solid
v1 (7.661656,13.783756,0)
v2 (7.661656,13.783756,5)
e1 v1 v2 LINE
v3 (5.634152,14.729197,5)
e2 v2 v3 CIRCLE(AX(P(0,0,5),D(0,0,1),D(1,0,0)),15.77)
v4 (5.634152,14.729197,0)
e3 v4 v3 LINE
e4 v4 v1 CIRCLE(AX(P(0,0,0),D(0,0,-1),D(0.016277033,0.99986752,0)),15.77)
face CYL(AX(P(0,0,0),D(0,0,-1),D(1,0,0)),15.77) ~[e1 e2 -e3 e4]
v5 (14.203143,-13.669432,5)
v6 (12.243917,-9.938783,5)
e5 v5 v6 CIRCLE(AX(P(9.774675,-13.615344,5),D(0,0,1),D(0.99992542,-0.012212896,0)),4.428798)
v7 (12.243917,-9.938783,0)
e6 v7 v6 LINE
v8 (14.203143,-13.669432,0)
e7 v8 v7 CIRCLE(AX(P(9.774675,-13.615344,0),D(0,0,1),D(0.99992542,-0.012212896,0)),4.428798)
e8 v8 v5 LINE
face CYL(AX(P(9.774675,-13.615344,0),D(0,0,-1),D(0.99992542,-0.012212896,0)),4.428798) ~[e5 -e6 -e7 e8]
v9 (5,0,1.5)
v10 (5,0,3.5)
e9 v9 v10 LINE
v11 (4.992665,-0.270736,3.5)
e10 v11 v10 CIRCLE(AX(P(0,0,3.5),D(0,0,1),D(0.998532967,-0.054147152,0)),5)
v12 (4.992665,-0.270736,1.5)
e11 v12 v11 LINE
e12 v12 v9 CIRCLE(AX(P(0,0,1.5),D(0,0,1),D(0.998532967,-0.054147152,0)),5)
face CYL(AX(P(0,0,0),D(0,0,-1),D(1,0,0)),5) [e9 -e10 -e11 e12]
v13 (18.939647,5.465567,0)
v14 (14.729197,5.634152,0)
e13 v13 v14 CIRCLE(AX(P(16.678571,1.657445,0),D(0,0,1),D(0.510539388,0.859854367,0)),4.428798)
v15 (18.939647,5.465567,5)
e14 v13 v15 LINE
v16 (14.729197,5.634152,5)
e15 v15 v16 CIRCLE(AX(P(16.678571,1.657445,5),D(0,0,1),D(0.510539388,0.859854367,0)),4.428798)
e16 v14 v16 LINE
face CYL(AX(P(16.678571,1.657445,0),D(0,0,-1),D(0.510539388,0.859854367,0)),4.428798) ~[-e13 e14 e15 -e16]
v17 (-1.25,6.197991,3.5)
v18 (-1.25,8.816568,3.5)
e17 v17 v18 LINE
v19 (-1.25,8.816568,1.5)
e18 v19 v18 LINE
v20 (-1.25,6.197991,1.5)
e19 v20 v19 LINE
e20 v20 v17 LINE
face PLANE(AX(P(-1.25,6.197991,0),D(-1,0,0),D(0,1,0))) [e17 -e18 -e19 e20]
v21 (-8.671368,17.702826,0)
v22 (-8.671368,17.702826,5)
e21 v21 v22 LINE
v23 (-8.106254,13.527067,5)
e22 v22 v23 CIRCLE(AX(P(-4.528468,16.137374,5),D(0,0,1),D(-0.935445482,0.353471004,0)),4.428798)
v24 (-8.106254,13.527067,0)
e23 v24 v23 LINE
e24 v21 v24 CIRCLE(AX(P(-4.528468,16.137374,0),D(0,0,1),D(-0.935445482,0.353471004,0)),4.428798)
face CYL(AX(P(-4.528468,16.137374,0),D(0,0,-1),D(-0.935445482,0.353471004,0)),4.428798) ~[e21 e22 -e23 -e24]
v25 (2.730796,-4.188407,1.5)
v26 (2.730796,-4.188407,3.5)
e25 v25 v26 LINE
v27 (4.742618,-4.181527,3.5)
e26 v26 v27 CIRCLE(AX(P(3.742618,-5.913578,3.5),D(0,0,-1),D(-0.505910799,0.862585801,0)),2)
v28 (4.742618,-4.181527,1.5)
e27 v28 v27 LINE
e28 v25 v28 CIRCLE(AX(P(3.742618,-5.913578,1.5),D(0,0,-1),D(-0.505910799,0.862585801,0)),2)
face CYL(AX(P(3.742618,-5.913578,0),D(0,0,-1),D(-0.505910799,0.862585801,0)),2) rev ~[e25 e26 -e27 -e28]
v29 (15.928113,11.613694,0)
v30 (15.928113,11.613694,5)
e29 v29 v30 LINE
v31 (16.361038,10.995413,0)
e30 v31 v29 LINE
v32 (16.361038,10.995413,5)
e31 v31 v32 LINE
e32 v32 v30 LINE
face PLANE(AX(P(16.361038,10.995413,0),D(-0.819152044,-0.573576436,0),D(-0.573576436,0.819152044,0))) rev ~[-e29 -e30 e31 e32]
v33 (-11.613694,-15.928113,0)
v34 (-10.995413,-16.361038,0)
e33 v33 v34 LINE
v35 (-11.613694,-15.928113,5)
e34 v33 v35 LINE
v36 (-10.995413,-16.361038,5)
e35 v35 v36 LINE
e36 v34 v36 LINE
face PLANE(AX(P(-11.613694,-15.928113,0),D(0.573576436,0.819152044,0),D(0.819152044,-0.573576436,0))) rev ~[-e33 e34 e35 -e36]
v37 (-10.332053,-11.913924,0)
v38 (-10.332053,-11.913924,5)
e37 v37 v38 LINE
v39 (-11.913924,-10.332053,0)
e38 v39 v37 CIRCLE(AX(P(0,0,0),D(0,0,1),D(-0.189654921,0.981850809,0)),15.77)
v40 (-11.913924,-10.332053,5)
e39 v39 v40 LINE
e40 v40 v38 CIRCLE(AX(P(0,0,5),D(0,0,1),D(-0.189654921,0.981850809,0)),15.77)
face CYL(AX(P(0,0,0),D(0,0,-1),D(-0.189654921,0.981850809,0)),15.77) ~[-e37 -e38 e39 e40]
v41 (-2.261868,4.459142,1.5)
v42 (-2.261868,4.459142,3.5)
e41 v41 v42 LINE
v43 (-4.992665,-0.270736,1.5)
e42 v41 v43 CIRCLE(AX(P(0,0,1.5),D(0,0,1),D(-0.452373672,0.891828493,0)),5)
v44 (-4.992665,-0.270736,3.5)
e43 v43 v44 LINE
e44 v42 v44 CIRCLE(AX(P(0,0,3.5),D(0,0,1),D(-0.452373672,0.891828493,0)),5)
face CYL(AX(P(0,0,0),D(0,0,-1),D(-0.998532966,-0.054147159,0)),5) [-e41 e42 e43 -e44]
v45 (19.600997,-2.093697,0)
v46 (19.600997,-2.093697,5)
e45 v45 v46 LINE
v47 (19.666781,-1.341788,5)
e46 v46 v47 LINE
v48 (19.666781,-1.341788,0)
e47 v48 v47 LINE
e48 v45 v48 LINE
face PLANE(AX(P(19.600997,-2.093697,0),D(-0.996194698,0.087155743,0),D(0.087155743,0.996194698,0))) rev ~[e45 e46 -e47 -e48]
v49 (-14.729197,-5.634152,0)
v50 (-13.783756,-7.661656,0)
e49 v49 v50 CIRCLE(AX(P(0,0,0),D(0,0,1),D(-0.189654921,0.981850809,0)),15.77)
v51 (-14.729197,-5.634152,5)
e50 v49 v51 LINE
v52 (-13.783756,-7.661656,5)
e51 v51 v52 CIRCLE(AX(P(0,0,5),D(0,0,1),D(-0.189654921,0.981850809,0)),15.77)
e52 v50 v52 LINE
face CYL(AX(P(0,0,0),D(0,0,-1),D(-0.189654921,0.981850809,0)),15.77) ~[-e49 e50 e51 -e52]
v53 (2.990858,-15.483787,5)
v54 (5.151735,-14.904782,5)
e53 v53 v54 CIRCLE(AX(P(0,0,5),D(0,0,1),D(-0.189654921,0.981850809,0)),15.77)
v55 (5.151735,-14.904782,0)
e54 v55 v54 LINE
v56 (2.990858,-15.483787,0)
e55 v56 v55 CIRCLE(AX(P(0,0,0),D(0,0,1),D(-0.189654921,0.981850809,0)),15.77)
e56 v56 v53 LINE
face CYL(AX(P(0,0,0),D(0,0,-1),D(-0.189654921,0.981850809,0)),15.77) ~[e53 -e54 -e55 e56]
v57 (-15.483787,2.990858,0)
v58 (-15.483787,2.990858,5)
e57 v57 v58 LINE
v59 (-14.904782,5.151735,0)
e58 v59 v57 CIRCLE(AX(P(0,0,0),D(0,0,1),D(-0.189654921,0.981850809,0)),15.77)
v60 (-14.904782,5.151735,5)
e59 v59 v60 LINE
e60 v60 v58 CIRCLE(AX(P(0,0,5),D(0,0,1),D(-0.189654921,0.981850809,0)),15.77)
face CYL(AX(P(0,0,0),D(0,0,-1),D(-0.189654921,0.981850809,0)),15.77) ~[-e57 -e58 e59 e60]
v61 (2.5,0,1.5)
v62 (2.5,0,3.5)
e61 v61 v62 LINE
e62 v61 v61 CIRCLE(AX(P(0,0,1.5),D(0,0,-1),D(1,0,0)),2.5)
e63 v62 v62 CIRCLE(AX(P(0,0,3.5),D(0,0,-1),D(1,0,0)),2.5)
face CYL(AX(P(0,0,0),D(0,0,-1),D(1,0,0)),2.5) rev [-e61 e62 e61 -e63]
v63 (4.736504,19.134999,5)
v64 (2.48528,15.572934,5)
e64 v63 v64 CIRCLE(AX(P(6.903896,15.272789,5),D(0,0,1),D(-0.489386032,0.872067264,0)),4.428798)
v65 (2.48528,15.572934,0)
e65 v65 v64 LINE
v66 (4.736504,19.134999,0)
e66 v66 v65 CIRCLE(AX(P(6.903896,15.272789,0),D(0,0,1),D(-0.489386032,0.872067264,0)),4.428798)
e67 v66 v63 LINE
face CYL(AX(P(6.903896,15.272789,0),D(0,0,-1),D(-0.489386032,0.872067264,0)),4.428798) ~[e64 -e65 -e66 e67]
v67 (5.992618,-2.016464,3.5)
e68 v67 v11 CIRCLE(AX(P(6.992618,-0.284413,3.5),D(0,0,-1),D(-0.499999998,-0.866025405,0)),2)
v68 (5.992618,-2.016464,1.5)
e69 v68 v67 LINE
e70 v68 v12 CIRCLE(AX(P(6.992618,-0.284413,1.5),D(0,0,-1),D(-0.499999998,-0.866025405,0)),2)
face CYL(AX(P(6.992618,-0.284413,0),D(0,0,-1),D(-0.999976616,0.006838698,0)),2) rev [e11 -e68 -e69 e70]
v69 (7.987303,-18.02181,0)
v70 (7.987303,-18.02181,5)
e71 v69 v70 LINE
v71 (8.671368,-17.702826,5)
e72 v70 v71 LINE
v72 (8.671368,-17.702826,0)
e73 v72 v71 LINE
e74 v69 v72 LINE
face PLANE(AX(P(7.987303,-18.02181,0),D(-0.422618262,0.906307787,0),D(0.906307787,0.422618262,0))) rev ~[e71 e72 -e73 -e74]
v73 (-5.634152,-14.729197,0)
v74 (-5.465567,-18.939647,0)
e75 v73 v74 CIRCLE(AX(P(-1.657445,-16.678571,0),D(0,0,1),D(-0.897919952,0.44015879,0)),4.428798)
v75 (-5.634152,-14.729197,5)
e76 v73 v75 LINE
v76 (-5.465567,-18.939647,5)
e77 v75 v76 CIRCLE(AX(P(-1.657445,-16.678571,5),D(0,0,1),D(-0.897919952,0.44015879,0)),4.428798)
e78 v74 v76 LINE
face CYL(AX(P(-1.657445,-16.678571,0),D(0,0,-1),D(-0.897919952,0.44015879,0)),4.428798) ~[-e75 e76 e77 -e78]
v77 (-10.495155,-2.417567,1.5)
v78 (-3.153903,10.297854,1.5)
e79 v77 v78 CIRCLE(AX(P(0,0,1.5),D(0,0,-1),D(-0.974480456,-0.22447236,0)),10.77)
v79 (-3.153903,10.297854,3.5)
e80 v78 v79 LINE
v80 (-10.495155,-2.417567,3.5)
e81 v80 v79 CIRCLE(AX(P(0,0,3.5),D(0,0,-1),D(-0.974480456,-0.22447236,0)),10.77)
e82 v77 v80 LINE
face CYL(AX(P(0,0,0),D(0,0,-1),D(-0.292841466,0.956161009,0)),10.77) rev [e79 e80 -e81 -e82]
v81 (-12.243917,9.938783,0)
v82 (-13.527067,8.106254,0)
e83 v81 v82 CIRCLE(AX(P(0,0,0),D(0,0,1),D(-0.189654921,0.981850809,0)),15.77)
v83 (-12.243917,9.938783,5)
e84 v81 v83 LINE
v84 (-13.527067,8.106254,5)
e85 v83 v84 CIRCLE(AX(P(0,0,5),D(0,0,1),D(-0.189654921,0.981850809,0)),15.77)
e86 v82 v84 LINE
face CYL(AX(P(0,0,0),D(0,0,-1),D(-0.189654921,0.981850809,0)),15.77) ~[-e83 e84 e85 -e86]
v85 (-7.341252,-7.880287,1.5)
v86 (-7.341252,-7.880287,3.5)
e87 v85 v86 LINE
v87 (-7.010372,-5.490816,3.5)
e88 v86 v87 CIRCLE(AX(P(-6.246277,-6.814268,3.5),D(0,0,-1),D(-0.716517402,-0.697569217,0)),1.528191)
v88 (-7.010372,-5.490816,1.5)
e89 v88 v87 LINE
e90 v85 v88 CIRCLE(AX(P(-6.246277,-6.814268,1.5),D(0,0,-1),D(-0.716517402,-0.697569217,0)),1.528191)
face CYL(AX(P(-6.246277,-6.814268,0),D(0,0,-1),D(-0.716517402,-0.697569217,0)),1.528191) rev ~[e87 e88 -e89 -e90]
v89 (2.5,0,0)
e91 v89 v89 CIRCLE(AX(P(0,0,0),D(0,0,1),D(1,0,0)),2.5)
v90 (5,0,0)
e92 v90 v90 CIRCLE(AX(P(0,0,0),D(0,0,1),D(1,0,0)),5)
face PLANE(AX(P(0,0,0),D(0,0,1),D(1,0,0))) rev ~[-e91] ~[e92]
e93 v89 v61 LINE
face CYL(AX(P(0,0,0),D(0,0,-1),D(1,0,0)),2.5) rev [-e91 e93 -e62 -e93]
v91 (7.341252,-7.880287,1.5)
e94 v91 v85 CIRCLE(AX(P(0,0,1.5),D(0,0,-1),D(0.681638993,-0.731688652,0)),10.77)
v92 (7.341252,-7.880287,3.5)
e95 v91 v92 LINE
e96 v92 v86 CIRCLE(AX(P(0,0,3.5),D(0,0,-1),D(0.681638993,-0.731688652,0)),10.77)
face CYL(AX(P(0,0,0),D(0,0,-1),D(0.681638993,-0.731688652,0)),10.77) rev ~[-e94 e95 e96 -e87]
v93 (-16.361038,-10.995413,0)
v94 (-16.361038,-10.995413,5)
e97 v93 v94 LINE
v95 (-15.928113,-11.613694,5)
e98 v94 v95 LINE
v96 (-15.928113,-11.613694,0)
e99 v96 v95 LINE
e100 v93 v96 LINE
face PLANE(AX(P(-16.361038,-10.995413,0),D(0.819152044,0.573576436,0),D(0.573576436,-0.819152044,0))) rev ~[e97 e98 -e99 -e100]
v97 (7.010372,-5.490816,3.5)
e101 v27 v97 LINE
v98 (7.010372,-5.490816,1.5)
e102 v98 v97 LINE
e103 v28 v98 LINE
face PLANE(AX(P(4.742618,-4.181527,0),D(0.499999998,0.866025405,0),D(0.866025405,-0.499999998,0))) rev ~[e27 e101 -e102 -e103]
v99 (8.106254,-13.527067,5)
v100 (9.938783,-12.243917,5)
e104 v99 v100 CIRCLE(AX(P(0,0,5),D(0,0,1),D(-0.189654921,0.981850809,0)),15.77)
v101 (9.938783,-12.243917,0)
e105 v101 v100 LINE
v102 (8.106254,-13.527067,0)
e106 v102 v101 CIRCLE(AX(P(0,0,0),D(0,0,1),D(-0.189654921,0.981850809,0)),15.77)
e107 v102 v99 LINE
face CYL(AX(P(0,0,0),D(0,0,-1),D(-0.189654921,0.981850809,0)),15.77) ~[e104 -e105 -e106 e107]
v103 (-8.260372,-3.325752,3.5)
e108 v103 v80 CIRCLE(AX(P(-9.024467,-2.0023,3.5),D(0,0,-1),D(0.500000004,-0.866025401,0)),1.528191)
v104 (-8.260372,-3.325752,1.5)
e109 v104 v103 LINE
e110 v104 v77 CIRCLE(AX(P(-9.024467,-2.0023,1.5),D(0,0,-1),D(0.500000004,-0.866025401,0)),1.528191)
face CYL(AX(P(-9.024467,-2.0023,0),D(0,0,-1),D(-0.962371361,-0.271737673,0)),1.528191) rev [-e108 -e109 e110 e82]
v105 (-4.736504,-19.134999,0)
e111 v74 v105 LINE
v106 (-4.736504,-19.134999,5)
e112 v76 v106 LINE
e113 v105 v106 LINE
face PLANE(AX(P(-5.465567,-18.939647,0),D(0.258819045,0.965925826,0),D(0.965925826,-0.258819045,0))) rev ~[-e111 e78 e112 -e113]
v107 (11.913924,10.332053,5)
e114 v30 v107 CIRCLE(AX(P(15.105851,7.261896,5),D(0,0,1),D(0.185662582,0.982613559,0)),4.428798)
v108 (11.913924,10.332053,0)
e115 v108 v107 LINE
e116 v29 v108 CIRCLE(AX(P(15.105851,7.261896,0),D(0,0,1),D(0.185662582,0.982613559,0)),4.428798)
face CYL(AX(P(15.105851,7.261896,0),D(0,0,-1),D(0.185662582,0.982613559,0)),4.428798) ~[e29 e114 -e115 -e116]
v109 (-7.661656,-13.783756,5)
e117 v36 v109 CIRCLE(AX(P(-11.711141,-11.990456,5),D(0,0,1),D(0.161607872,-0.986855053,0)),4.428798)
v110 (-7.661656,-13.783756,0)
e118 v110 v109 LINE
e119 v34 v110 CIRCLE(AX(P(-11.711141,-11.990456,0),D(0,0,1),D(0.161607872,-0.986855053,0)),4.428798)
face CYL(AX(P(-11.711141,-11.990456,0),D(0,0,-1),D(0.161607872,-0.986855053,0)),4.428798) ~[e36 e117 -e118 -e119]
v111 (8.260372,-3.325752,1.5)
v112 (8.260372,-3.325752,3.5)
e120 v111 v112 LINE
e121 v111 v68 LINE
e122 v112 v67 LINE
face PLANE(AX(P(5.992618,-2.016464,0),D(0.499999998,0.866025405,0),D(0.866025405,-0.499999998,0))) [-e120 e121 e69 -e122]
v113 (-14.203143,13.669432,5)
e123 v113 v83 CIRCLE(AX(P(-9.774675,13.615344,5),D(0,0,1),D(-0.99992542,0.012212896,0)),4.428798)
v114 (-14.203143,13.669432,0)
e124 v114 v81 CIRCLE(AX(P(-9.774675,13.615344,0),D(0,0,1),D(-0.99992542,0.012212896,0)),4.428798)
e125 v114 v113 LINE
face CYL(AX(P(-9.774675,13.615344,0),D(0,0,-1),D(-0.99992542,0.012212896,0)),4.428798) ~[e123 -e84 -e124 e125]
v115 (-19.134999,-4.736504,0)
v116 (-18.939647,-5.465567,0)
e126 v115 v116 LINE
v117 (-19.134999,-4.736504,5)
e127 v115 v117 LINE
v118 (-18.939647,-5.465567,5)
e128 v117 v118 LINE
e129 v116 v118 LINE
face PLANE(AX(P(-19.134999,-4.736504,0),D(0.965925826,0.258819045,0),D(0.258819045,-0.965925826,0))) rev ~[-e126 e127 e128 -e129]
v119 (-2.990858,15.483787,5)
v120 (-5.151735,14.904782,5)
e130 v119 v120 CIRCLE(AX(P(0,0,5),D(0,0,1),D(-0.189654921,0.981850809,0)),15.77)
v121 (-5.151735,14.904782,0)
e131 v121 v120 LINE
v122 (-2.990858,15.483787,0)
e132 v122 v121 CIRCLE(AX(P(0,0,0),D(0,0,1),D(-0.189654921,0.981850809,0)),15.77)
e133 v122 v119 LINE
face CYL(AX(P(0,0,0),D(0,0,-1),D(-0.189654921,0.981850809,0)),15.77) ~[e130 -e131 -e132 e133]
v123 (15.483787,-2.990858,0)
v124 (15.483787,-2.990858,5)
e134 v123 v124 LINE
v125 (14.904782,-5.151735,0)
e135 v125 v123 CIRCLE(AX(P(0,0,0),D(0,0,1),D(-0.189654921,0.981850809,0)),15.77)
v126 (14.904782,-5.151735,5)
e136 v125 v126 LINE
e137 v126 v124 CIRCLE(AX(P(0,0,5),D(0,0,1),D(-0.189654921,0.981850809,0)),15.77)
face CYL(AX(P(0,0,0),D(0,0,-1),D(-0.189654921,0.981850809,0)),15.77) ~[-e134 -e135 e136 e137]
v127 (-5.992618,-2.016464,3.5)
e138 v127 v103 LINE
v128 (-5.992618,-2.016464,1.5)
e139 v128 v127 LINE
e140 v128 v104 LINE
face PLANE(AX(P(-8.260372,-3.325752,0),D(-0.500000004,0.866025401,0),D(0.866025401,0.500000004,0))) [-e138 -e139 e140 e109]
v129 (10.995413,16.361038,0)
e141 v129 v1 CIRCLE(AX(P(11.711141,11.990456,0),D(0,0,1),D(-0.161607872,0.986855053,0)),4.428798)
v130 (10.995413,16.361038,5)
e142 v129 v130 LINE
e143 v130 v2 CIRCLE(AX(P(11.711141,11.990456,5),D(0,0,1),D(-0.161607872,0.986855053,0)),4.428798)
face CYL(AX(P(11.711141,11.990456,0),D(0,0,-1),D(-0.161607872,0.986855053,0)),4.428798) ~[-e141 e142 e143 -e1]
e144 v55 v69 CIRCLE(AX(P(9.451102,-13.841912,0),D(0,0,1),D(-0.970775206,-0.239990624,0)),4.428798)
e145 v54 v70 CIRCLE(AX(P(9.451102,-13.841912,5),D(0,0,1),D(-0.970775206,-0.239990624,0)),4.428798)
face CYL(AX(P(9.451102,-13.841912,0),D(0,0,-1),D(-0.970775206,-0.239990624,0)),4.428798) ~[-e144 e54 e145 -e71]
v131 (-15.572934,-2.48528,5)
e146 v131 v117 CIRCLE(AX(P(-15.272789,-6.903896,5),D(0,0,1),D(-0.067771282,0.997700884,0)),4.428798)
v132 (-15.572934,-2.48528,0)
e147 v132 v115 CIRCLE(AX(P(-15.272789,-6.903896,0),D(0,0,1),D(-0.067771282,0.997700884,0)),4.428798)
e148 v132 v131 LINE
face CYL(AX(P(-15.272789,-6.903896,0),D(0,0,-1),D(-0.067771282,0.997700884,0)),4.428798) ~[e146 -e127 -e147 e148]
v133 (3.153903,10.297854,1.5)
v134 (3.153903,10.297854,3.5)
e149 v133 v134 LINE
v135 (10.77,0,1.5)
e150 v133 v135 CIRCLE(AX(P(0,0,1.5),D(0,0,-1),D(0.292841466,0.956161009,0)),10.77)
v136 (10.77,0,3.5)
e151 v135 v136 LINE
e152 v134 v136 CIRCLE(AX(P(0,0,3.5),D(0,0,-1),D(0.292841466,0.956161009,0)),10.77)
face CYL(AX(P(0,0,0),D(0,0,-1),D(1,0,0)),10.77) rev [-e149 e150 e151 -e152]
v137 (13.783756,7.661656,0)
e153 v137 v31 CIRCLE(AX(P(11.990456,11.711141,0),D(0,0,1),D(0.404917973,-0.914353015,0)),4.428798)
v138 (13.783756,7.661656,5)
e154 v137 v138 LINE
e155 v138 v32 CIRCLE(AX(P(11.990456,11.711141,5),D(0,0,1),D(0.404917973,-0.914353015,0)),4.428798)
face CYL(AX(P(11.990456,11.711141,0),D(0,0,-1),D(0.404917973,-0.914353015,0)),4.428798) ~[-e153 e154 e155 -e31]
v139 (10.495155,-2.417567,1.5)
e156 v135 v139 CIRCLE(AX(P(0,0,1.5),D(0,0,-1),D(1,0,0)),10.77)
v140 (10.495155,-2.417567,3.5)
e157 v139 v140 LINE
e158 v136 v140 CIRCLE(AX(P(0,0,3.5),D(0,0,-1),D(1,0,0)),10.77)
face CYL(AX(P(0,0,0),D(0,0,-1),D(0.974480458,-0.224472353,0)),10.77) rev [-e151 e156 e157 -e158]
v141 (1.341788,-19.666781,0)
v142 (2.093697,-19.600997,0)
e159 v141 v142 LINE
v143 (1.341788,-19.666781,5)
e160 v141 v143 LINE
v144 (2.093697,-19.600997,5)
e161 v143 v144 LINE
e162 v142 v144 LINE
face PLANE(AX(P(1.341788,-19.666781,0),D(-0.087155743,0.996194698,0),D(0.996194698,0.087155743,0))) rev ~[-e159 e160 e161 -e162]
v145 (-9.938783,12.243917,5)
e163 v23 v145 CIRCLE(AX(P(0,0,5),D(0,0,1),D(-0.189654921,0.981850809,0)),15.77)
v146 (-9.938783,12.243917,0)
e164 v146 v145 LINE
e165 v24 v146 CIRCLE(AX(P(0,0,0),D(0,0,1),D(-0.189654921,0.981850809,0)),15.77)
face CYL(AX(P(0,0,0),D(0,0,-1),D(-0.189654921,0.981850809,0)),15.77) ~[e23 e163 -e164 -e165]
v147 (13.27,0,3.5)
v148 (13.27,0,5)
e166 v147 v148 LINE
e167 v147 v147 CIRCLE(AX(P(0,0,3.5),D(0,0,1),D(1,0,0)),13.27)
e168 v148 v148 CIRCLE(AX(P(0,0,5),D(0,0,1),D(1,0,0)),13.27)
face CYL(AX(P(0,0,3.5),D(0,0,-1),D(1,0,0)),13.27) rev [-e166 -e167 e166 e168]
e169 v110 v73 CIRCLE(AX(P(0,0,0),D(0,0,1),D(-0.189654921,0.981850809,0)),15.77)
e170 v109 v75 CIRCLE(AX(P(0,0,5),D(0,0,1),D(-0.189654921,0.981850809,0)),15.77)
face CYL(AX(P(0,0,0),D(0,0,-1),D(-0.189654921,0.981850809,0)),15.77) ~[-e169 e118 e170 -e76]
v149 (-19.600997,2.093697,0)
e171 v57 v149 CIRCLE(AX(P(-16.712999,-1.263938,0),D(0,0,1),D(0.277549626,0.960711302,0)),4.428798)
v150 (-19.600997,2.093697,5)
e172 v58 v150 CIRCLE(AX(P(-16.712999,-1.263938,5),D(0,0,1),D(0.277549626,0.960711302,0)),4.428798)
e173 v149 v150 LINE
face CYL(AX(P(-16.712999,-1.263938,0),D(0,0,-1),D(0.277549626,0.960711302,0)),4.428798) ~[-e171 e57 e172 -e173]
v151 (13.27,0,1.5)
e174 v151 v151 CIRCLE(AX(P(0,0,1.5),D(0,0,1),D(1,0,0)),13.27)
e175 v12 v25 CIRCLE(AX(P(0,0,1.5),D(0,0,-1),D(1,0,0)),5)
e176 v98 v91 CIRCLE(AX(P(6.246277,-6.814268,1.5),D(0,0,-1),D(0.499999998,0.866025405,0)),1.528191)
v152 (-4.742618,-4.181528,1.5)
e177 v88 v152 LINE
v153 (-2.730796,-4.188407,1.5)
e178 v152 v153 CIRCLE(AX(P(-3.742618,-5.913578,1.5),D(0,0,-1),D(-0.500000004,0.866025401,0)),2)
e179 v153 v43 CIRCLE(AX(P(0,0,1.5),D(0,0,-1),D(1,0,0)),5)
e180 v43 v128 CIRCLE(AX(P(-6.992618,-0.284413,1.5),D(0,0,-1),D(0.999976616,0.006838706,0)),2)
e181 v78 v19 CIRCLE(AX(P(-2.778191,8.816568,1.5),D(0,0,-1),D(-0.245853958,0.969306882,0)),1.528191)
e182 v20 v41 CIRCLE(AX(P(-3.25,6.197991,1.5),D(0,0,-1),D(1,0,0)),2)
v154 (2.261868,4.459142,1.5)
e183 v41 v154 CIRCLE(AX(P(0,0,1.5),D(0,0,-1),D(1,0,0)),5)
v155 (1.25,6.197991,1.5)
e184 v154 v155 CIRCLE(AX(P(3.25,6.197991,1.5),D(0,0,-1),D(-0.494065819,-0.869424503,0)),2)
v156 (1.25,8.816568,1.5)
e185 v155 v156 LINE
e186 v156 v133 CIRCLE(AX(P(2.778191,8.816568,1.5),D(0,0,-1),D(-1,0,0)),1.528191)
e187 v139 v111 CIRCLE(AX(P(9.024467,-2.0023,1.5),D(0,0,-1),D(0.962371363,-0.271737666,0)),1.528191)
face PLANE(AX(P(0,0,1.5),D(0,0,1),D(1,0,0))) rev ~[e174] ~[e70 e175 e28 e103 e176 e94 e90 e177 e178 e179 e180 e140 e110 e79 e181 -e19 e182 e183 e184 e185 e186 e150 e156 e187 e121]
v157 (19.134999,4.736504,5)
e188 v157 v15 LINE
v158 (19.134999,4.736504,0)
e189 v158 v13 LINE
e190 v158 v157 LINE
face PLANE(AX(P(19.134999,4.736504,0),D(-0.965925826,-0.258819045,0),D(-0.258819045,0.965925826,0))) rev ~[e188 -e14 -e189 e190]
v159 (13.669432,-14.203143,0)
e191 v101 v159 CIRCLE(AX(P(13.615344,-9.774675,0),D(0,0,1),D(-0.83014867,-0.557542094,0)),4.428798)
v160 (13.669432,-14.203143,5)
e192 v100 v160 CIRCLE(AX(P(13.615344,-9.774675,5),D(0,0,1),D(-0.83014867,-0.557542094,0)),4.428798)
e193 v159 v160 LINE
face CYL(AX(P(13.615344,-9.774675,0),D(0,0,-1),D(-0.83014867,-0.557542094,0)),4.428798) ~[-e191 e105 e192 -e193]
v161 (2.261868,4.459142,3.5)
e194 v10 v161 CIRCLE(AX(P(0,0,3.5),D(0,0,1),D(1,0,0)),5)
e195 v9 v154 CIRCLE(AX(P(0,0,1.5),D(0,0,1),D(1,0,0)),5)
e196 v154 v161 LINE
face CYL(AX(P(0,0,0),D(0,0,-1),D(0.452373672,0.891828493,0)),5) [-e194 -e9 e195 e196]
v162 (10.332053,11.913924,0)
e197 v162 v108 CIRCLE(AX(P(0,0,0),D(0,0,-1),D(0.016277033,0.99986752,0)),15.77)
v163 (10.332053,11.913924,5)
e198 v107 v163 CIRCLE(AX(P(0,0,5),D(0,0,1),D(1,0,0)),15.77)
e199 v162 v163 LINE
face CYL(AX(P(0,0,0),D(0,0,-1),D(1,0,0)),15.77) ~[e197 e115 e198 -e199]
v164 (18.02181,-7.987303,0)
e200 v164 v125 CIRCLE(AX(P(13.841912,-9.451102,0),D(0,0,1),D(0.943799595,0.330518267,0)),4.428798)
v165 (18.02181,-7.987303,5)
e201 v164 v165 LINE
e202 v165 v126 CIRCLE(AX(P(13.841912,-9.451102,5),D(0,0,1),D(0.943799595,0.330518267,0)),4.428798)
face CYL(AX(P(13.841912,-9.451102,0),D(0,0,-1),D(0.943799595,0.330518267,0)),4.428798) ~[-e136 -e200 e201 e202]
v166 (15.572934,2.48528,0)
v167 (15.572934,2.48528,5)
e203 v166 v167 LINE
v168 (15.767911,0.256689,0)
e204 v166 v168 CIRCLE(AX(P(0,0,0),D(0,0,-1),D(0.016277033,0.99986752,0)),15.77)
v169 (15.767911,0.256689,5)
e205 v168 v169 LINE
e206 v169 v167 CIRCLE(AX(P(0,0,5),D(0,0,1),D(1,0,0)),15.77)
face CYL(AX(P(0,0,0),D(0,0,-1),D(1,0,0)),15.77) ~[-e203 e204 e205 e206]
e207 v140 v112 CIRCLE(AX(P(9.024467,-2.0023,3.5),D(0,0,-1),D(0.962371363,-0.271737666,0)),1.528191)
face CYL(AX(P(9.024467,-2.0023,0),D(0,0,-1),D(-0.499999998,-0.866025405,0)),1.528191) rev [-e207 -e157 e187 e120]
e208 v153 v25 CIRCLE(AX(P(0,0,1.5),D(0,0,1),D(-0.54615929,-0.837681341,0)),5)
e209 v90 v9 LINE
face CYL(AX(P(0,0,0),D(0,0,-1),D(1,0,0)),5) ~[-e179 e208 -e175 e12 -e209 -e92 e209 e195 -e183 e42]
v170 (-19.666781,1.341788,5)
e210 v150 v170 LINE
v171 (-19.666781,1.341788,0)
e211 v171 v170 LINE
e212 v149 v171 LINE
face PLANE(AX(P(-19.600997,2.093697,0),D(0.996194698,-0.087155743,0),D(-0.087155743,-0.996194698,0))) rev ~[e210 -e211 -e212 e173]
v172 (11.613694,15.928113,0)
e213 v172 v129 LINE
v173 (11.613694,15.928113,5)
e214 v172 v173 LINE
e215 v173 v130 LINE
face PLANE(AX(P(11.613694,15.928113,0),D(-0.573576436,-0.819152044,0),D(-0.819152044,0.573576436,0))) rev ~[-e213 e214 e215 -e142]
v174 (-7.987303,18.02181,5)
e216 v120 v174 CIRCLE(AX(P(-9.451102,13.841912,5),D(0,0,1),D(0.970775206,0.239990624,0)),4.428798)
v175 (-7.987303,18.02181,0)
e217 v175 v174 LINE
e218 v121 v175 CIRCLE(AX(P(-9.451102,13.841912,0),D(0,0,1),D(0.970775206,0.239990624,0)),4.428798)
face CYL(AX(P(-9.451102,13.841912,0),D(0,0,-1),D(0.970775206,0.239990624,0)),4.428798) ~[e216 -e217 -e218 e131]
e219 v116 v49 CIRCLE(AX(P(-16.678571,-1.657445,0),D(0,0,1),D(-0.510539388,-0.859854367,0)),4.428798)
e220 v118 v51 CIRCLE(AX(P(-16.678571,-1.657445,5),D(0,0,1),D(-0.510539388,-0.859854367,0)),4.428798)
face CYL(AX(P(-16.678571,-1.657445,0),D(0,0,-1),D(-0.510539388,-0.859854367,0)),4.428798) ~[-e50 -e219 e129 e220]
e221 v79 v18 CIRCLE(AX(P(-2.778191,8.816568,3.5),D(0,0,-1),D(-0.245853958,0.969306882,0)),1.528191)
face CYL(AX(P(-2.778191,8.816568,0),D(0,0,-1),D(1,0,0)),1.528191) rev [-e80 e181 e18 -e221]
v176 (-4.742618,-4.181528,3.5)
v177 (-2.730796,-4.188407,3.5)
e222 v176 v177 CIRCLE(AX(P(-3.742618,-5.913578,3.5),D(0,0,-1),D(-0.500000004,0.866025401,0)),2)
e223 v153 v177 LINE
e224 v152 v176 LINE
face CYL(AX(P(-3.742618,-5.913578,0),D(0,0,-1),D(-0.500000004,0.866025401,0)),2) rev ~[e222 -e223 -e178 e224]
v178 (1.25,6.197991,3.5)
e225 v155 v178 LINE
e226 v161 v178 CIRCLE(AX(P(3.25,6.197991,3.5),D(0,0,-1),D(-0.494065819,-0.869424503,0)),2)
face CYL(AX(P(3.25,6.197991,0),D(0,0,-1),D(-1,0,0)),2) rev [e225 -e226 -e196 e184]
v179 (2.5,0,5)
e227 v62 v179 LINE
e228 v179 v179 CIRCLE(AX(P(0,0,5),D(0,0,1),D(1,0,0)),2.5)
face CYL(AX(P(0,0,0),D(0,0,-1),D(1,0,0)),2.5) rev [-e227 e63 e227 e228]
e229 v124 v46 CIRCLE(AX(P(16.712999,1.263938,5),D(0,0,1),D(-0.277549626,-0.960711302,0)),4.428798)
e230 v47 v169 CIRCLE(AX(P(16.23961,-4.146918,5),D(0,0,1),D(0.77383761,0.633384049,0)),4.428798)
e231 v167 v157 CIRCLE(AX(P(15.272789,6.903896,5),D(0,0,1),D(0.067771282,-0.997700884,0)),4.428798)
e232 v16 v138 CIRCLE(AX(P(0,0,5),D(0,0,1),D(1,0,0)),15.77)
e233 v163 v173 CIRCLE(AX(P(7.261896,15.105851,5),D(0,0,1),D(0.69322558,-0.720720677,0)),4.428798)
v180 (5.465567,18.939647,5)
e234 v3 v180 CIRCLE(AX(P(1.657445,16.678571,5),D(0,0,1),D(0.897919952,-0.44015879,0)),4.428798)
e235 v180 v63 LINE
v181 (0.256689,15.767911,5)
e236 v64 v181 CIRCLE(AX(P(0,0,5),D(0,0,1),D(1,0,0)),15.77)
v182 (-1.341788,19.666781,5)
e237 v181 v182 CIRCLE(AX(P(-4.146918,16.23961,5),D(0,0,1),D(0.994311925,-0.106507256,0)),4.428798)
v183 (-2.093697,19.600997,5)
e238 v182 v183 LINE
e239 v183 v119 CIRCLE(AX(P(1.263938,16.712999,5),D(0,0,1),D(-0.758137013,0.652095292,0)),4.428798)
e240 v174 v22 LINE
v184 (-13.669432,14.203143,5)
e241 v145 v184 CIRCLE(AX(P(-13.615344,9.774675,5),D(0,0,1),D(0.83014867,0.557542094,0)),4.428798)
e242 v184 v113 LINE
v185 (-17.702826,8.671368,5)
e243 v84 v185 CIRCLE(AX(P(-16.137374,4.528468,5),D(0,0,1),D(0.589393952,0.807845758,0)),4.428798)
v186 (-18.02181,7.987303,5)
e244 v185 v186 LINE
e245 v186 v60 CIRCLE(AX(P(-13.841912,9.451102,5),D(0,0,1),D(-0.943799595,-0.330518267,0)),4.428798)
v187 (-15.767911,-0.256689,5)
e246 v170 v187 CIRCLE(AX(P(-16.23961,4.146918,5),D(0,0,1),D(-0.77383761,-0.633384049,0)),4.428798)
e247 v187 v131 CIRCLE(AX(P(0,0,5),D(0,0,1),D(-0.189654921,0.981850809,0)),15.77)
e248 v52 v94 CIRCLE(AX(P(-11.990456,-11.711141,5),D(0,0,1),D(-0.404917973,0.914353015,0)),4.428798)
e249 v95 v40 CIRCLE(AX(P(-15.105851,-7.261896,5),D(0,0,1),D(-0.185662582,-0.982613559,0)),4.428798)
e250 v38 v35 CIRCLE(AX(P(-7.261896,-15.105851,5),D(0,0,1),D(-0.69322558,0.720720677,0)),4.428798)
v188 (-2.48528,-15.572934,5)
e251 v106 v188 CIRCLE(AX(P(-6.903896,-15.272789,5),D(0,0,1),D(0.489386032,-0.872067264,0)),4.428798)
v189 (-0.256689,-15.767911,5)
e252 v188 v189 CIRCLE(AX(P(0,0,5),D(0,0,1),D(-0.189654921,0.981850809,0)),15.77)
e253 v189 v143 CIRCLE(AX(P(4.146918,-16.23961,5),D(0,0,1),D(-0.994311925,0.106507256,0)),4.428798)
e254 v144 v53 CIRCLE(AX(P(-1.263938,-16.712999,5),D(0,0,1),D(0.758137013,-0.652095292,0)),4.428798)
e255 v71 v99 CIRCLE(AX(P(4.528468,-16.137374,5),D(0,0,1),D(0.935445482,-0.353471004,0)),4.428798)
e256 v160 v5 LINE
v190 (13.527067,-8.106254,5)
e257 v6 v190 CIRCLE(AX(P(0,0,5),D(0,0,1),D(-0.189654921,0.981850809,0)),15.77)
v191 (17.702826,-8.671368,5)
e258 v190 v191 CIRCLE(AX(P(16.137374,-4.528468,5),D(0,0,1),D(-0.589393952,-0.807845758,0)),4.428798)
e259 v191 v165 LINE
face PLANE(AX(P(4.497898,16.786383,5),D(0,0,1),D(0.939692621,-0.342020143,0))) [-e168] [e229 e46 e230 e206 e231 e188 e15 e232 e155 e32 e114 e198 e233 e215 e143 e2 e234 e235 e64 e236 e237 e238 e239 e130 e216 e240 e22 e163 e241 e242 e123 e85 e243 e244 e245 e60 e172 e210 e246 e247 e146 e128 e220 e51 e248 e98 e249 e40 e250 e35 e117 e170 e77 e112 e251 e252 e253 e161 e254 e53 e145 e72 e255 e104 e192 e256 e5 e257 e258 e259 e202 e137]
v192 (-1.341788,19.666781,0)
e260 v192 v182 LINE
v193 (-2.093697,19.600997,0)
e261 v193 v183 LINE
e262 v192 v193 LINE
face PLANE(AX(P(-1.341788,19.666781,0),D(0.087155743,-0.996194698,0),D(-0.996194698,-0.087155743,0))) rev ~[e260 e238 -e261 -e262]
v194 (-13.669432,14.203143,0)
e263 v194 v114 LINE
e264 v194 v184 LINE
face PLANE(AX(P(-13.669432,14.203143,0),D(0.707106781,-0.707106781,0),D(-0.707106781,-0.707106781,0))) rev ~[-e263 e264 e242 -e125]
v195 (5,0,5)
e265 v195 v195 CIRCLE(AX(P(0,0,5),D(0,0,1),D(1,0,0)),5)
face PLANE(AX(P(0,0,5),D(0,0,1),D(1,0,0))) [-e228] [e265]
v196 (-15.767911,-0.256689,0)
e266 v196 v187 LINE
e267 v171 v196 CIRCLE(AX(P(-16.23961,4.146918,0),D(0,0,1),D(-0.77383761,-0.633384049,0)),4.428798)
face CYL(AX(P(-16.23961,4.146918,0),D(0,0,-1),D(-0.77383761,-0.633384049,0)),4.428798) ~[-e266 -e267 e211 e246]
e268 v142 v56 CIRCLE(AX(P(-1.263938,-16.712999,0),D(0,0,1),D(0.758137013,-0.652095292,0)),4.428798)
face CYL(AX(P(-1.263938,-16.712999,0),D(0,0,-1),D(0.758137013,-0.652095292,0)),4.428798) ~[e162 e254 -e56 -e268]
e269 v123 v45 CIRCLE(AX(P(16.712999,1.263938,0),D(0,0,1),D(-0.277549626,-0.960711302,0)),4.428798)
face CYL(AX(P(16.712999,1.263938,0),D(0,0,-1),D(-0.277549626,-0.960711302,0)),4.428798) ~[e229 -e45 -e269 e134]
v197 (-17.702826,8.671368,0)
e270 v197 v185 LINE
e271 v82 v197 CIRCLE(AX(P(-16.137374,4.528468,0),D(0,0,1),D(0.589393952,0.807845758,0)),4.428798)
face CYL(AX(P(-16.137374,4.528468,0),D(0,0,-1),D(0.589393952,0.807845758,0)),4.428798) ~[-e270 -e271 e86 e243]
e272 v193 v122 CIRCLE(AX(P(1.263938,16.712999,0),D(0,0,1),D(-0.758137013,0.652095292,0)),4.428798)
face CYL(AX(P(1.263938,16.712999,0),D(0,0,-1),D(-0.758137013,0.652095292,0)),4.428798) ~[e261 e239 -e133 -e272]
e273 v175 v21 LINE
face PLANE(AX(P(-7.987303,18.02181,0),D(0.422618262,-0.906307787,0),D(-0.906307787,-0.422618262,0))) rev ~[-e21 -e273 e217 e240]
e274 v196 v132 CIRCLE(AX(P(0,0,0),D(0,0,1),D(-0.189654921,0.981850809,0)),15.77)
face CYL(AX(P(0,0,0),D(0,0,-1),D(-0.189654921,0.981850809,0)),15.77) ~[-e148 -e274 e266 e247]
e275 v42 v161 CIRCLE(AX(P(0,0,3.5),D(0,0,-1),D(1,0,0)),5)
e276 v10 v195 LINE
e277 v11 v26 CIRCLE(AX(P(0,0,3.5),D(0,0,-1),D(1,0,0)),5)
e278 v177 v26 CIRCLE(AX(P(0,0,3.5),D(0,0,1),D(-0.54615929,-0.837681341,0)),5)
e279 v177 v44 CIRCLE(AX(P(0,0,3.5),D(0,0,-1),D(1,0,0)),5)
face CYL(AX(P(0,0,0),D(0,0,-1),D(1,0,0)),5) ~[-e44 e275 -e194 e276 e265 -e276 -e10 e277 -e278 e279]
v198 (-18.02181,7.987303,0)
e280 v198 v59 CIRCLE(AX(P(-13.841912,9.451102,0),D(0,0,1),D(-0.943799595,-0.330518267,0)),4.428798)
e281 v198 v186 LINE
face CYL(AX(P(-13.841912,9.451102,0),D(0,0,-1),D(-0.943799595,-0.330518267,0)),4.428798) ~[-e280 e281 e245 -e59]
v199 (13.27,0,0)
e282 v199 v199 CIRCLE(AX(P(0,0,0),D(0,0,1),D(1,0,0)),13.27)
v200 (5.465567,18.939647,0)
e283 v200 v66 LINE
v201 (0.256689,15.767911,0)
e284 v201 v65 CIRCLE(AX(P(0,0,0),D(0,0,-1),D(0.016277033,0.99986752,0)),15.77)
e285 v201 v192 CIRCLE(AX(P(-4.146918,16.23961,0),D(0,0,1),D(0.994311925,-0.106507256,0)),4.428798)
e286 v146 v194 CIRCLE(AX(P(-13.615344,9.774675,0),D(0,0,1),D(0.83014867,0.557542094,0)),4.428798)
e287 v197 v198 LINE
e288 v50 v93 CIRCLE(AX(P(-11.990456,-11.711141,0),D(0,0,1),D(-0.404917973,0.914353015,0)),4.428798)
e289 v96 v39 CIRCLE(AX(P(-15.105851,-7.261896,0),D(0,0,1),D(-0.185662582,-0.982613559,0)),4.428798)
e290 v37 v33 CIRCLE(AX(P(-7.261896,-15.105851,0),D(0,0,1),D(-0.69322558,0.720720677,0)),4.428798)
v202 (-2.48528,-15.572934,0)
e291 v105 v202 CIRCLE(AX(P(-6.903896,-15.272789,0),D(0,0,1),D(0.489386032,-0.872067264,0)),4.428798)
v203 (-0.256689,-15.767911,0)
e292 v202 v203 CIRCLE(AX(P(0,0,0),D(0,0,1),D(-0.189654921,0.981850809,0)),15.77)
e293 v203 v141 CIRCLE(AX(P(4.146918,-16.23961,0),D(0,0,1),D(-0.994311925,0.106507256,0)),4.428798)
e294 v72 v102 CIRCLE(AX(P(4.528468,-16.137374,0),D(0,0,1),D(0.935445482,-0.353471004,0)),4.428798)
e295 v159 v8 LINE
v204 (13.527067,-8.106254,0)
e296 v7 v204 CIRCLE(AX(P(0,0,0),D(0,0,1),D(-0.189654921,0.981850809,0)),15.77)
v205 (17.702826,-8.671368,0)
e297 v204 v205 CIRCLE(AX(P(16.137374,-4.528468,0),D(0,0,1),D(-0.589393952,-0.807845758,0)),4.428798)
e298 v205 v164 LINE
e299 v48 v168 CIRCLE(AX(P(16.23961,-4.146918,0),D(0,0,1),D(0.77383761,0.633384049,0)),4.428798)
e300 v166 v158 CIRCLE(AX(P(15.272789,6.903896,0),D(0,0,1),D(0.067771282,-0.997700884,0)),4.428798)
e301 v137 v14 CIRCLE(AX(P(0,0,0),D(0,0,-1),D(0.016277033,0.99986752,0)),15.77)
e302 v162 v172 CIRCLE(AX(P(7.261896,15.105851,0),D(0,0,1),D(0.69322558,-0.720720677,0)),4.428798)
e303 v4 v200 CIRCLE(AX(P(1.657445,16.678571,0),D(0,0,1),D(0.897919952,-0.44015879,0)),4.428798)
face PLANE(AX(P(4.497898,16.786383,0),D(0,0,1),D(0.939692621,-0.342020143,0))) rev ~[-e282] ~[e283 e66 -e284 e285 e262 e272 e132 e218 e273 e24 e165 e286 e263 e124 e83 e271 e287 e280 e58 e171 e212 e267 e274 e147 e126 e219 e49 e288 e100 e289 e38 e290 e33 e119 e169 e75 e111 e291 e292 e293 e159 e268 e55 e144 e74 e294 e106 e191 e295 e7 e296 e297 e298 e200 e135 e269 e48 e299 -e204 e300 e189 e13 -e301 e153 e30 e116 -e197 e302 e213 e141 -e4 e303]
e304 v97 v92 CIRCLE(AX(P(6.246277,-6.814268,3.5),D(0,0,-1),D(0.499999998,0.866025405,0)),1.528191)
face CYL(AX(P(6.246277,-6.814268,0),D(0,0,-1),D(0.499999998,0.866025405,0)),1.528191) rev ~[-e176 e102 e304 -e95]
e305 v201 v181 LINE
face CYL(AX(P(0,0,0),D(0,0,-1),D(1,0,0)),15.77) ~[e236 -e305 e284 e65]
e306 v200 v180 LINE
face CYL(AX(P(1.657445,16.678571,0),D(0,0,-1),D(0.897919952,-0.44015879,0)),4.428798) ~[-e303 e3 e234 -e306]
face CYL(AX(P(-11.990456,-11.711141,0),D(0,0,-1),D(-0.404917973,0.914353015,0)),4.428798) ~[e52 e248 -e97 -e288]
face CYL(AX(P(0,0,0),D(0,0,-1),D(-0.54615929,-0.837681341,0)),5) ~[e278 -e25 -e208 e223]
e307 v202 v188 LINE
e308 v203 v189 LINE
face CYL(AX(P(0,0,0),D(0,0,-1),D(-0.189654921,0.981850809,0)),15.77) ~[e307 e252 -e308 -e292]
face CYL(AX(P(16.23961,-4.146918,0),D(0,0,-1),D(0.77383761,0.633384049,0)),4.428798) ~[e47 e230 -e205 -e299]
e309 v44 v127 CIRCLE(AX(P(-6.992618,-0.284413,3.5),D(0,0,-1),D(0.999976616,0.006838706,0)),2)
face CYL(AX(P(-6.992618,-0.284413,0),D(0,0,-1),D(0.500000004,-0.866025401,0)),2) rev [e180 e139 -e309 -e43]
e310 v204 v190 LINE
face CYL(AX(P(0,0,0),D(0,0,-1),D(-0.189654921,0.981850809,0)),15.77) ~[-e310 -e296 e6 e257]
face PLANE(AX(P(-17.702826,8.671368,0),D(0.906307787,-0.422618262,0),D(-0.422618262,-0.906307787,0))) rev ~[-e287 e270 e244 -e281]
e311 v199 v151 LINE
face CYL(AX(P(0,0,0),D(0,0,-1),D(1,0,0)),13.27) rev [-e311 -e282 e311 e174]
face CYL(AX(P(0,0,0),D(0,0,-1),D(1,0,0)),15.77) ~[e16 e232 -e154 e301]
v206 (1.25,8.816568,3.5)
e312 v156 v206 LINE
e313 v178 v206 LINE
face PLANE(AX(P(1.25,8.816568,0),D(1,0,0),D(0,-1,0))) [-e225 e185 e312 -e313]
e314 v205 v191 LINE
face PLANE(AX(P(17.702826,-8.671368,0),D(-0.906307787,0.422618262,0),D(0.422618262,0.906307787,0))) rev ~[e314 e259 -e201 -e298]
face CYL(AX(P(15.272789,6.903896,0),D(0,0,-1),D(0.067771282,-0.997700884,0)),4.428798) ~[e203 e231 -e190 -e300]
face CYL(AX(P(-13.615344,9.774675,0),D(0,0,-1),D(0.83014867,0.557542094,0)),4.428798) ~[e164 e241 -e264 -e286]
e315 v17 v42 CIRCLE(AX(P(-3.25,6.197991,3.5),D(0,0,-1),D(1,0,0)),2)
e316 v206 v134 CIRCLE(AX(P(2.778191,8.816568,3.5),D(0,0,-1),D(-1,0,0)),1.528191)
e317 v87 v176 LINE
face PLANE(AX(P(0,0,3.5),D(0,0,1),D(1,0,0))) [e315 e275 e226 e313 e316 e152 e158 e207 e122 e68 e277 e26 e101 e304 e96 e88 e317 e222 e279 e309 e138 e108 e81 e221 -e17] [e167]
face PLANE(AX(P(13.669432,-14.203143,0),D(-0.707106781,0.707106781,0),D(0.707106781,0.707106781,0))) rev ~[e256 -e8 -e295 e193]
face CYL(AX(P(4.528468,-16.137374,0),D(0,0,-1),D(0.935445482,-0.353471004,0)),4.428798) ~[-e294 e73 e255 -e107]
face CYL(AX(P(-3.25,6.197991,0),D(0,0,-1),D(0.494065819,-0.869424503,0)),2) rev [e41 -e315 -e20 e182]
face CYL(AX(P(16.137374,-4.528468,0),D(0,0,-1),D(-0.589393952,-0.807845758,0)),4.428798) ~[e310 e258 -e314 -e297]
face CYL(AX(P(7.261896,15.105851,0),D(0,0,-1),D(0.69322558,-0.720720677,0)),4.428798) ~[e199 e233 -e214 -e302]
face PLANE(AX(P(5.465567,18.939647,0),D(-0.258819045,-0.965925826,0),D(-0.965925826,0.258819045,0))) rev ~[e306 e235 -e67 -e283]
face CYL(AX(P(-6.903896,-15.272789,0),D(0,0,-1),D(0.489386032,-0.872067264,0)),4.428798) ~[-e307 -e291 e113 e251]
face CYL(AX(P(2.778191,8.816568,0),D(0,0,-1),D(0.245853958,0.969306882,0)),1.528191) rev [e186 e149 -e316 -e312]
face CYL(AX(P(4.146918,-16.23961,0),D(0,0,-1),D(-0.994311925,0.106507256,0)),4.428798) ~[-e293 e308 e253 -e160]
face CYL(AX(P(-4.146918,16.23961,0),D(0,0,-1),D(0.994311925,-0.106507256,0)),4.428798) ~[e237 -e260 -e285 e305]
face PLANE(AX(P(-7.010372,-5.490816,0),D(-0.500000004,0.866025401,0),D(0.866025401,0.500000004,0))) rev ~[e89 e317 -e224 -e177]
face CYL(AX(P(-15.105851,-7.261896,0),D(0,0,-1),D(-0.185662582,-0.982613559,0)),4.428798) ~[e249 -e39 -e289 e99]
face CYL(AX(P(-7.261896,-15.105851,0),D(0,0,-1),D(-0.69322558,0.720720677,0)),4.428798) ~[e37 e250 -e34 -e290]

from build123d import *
from build123d import SkipClean  # not in build123d's __all__

# Parameters (mm, degrees)
F2_R      = 2.5
F4_DEPTH  = 5
F5_COUNT  = 18
F5_ANGLE  = 340
F7_DEPTH  = 5.001
F6_R      = 13.27
F6_W      = 2.5
F6_H      = 2.618576711
F8_DEPTH  = 1.5
F9_DEPTH  = 5.001
F10_START = 3.5
F10_DEPTH = 1.5
F11_R     = 5
F11_R_2   = 2.5
F12_DEPTH = 5


# Not quite as in the source:
# - a feature names something its author has since deleted; it is built from what else it names


with BuildPart() as f4:
    # F2 (on Top) → F4 (new body)
    with BuildSketch(Plane.XY):
        with BuildLine():
            ThreePointArc((-2.990858108, 15.4837872556), (-1.3744460631, 15.7099903889), (0.2566888126, 15.7679107955))
            ThreePointArc((0.2566888126, 15.7679107955), (-0.0491419998, 17.9196352526), (-1.341787956, 19.666780655))
            Line((-1.341787956, 19.666780655), (-2.0936974393, 19.6009970992))
            ThreePointArc((-2.0936974393, 19.6009970992), (-3.0633165837, 17.6559291466), (-2.990858108, 15.4837872556))
        make_face()
        with BuildLine():
            ThreePointArc((-2.990858108, 15.4837872556), (-10.0381040948, -12.1626216821), (15.77, 0))
            ThreePointArc((15.77, 0), (11.2414608164, 11.0599484046), (0.2566888126, 15.7679107955))
            ThreePointArc((0.2566888126, 15.7679107955), (-1.3744460631, 15.7099903889), (-2.990858108, 15.4837872556))
        make_face()
        Circle(F2_R, mode=Mode.SUBTRACT)
    extrude(amount=F4_DEPTH)

    # F5: F4 ×18 about axis
    f5_axis = Axis((0, 0, 30.7848658413), (0, 0, 1))


with BuildPart() as f4_1:
    add(f4.part, clean=False)
    for i in range(1, F5_COUNT):
        add(f4.part.rotate(f5_axis, i * F5_ANGLE / (F5_COUNT - 1)), clean=False)

    # F6 (on Top) → F7 (cut, through all)
    with BuildSketch(Plane.XY):
        with BuildLine():
            ThreePointArc((2.2618683613, 4.4591424642), (4.2608298374, 2.6163579833), (5, 0))
            ThreePointArc((5, 0), (4.9981658722, -0.1354175543), (4.9926648344, -0.2707357593))
            ThreePointArc((4.9926648344, -0.2707357593), (5.2571580162, -1.2784847908), (5.9926180702, -2.0164639659))
            Line((5.9926180702, -2.0164639659), (8.2603720268, -3.325752316))
            ThreePointArc((8.2603720268, -3.325752316), (9.5998090611, -3.4180506459), (10.4951545309, -2.4175672426))
            ThreePointArc((10.4951545309, -2.4175672426), (10.7010680378, -1.2165701176), (10.77, 0))
            ThreePointArc((10.77, 0), (8.6591117019, 6.4041146566), (3.1539025934, 10.2978540692))
            ThreePointArc((3.1539025934, 10.2978540692), (1.8397858158, 10.0227038458), (1.25, 8.8165681809))
            Line((1.25, 8.8165681809), (1.25, 6.1979914699))
            ThreePointArc((1.25, 6.1979914699), (1.5213786885, 5.1920747928), (2.2618683613, 4.4591424642))
        make_face()
        with BuildLine():
            ThreePointArc((-4.9926648325, -0.2707357951), (-4.3301270249, 2.4999999896), (-2.2618683613, 4.4591424642))
            ThreePointArc((-2.2618683613, 4.4591424642), (-1.5213786885, 5.1920747928), (-1.25, 6.1979914699))
            Line((-1.25, 6.1979914699), (-1.25, 8.8165681809))
            ThreePointArc((-1.25, 8.8165681809), (-1.8397858158, 10.0227038458), (-3.1539025934, 10.2978540692))
            ThreePointArc((-3.1539025934, 10.2978540692), (-9.3270936116, 5.3849999777), (-10.4951545136, -2.4175673179))
            ThreePointArc((-10.4951545136, -2.4175673179), (-9.5998090366, -3.4180507148), (-8.260372003, -3.3257523753))
            Line((-8.260372003, -3.3257523753), (-5.9926180557, -2.0164640089))
            ThreePointArc((-5.9926180557, -2.0164640089), (-5.257158007, -1.2784848286), (-4.9926648325, -0.2707357951))
        make_face()
    extrude(amount=F7_DEPTH, mode=Mode.SUBTRACT)

    # F6 (on Top) → F8 (cut)
    with BuildSketch(Plane.XY):
        Circle(F6_R)
        with BuildLine():
            ThreePointArc((-3.1539025934, 10.2978540692), (0, 10.77), (3.1539025934, 10.2978540692))
            ThreePointArc((3.1539025934, 10.2978540692), (8.6591117019, 6.4041146566), (10.77, 0))
            ThreePointArc((10.77, 0), (10.7010680378, -1.2165701176), (10.4951545309, -2.4175672426))
            ThreePointArc((10.4951545309, -2.4175672426), (9.3270936116, -5.3849999777), (7.3412519506, -7.880286784))
            ThreePointArc((7.3412519506, -7.880286784), (3.87e-08, -10.77), (-7.341251894, -7.8802868367))
            ThreePointArc((-7.341251894, -7.8802868367), (-9.327093573, -5.3850000446), (-10.4951545136, -2.4175673179))
            ThreePointArc((-10.4951545136, -2.4175673179), (-9.3270936116, 5.3849999777), (-3.1539025934, 10.2978540692))
        make_face(mode=Mode.SUBTRACT)
        with BuildLine():
            ThreePointArc((4.9926648344, -0.2707357593), (4.9981658722, -0.1354175543), (5, 0))
            ThreePointArc((5, 0), (4.2608298374, 2.6163579833), (2.2618683613, 4.4591424642))
            ThreePointArc((2.2618683613, 4.4591424642), (0, 5), (-2.2618683613, 4.4591424642))
            ThreePointArc((-2.2618683613, 4.4591424642), (-4.3301270249, 2.4999999896), (-4.9926648325, -0.2707357951))
            ThreePointArc((-4.9926648325, -0.2707357951), (-4.330127007, -2.5000000207), (-2.7307964524, -4.1884067061))
            ThreePointArc((-2.7307964524, -4.1884067061), (1.79e-08, -5), (2.7307964825, -4.1884066865))
            ThreePointArc((2.7307964825, -4.1884066865), (4.3301270249, -2.4999999896), (4.9926648344, -0.2707357593))
        make_face()
        with BuildLine():
            ThreePointArc((-2.2618683613, 4.4591424642), (0, 5), (2.2618683613, 4.4591424642))
            ThreePointArc((2.2618683613, 4.4591424642), (1.5213786885, 5.1920747928), (1.25, 6.1979914699))
            Line((1.25, 6.1979914699), (-1.25, 6.1979914699))
            ThreePointArc((-1.25, 6.1979914699), (-1.5213786885, 5.1920747928), (-2.2618683613, 4.4591424642))
        make_face()
        with Locations((0, 7.5072798254)):
            Rectangle(F6_W, F6_H)
        with BuildLine():
            Line((-1.25, 8.8165681809), (1.25, 8.8165681809))
            ThreePointArc((1.25, 8.8165681809), (1.8397858158, 10.0227038458), (3.1539025934, 10.2978540692))
            ThreePointArc((3.1539025934, 10.2978540692), (0, 10.77), (-3.1539025934, 10.2978540692))
            ThreePointArc((-3.1539025934, 10.2978540692), (-1.8397858158, 10.0227038458), (-1.25, 8.8165681809))
        make_face()
        with BuildLine():
            ThreePointArc((-2.7307964524, -4.1884067061), (-4.330127007, -2.5000000207), (-4.9926648325, -0.2707357951))
            ThreePointArc((-4.9926648325, -0.2707357951), (-5.257158007, -1.2784848286), (-5.9926180557, -2.0164640089))
            Line((-5.9926180557, -2.0164640089), (-4.7426180454, -4.1815275124))
            ThreePointArc((-4.7426180454, -4.1815275124), (-3.7357793059, -3.9135900073), (-2.7307964524, -4.1884067061))
        make_face()
        Polygon((-4.7426180454, -4.1815275124), (-5.9926180557, -2.0164640089), (-8.260372003, -3.3257523753), (-7.0103719926, -5.4908158787), align=None)
        with BuildLine():
            Line((-7.0103719926, -5.4908158787), (-8.260372003, -3.3257523753))
            ThreePointArc((-8.260372003, -3.3257523753), (-9.5998090366, -3.4180507148), (-10.4951545136, -2.4175673179))
            ThreePointArc((-10.4951545136, -2.4175673179), (-9.327093573, -5.3850000446), (-7.341251894, -7.8802868367))
            ThreePointArc((-7.341251894, -7.8802868367), (-7.7600232055, -6.6046532141), (-7.0103719926, -5.4908158787))
        make_face()
        with BuildLine():
            ThreePointArc((10.4951545309, -2.4175672426), (9.5998090611, -3.4180506459), (8.2603720268, -3.325752316))
            Line((8.2603720268, -3.325752316), (7.010372032, -5.4908158284))
            ThreePointArc((7.010372032, -5.4908158284), (7.7600232529, -6.6046531583), (7.3412519506, -7.880286784))
            ThreePointArc((7.3412519506, -7.880286784), (9.3270936116, -5.3849999777), (10.4951545309, -2.4175672426))
        make_face()
        Polygon((8.2603720268, -3.325752316), (5.9926180702, -2.0164639659), (4.7426180754, -4.1815274783), (7.010372032, -5.4908158284), align=None)
        with BuildLine():
            ThreePointArc((5.9926180702, -2.0164639659), (5.2571580162, -1.2784847908), (4.9926648344, -0.2707357593))
            ThreePointArc((4.9926648344, -0.2707357593), (4.3301270249, -2.4999999896), (2.7307964825, -4.1884066865))
            ThreePointArc((2.7307964825, -4.1884066865), (3.735779334, -3.9135899804), (4.7426180754, -4.1815274783))
            Line((4.7426180754, -4.1815274783), (5.9926180702, -2.0164639659))
        make_face()
    extrude(amount=F8_DEPTH, mode=Mode.SUBTRACT)

    # F9 (cut, through all): a face of the model
    f9_faces = [f4_1.faces().sort_by_distance(p)[0] for p in [
        (2.61e-08, -7.2727720269, 0),
    ]]
    extrude(f9_faces, amount=-F9_DEPTH, mode=Mode.SUBTRACT)

    # F6 (on Top) → F10 (cut)
    with BuildSketch(Plane.XY.offset(F10_START)):
        Circle(F6_R)
        with BuildLine():
            ThreePointArc((-3.1539025934, 10.2978540692), (0, 10.77), (3.1539025934, 10.2978540692))
            ThreePointArc((3.1539025934, 10.2978540692), (8.6591117019, 6.4041146566), (10.77, 0))
            ThreePointArc((10.77, 0), (10.7010680378, -1.2165701176), (10.4951545309, -2.4175672426))
            ThreePointArc((10.4951545309, -2.4175672426), (9.3270936116, -5.3849999777), (7.3412519506, -7.880286784))
            ThreePointArc((7.3412519506, -7.880286784), (3.87e-08, -10.77), (-7.341251894, -7.8802868367))
            ThreePointArc((-7.341251894, -7.8802868367), (-9.327093573, -5.3850000446), (-10.4951545136, -2.4175673179))
            ThreePointArc((-10.4951545136, -2.4175673179), (-9.3270936116, 5.3849999777), (-3.1539025934, 10.2978540692))
        make_face(mode=Mode.SUBTRACT)
        with BuildLine():
            ThreePointArc((4.9926648344, -0.2707357593), (4.9981658722, -0.1354175543), (5, 0))
            ThreePointArc((5, 0), (4.2608298374, 2.6163579833), (2.2618683613, 4.4591424642))
            ThreePointArc((2.2618683613, 4.4591424642), (0, 5), (-2.2618683613, 4.4591424642))
            ThreePointArc((-2.2618683613, 4.4591424642), (-4.3301270249, 2.4999999896), (-4.9926648325, -0.2707357951))
            ThreePointArc((-4.9926648325, -0.2707357951), (-4.330127007, -2.5000000207), (-2.7307964524, -4.1884067061))
            ThreePointArc((-2.7307964524, -4.1884067061), (1.79e-08, -5), (2.7307964825, -4.1884066865))
            ThreePointArc((2.7307964825, -4.1884066865), (4.3301270249, -2.4999999896), (4.9926648344, -0.2707357593))
        make_face()
        with BuildLine():
            ThreePointArc((10.4951545309, -2.4175672426), (9.5998090611, -3.4180506459), (8.2603720268, -3.325752316))
            Line((8.2603720268, -3.325752316), (7.010372032, -5.4908158284))
            ThreePointArc((7.010372032, -5.4908158284), (7.7600232529, -6.6046531583), (7.3412519506, -7.880286784))
            ThreePointArc((7.3412519506, -7.880286784), (9.3270936116, -5.3849999777), (10.4951545309, -2.4175672426))
        make_face()
        Polygon((8.2603720268, -3.325752316), (5.9926180702, -2.0164639659), (4.7426180754, -4.1815274783), (7.010372032, -5.4908158284), align=None)
        with BuildLine():
            ThreePointArc((5.9926180702, -2.0164639659), (5.2571580162, -1.2784847908), (4.9926648344, -0.2707357593))
            ThreePointArc((4.9926648344, -0.2707357593), (4.3301270249, -2.4999999896), (2.7307964825, -4.1884066865))
            ThreePointArc((2.7307964825, -4.1884066865), (3.735779334, -3.9135899804), (4.7426180754, -4.1815274783))
            Line((4.7426180754, -4.1815274783), (5.9926180702, -2.0164639659))
        make_face()
        with BuildLine():
            ThreePointArc((-2.2618683613, 4.4591424642), (0, 5), (2.2618683613, 4.4591424642))
            ThreePointArc((2.2618683613, 4.4591424642), (1.5213786885, 5.1920747928), (1.25, 6.1979914699))
            Line((1.25, 6.1979914699), (-1.25, 6.1979914699))
            ThreePointArc((-1.25, 6.1979914699), (-1.5213786885, 5.1920747928), (-2.2618683613, 4.4591424642))
        make_face()
        with Locations((0, 7.5072798254)):
            Rectangle(F6_W, F6_H)
        with BuildLine():
            Line((-1.25, 8.8165681809), (1.25, 8.8165681809))
            ThreePointArc((1.25, 8.8165681809), (1.8397858158, 10.0227038458), (3.1539025934, 10.2978540692))
            ThreePointArc((3.1539025934, 10.2978540692), (0, 10.77), (-3.1539025934, 10.2978540692))
            ThreePointArc((-3.1539025934, 10.2978540692), (-1.8397858158, 10.0227038458), (-1.25, 8.8165681809))
        make_face()
        with BuildLine():
            ThreePointArc((-2.7307964524, -4.1884067061), (-4.330127007, -2.5000000207), (-4.9926648325, -0.2707357951))
            ThreePointArc((-4.9926648325, -0.2707357951), (-5.257158007, -1.2784848286), (-5.9926180557, -2.0164640089))
            Line((-5.9926180557, -2.0164640089), (-4.7426180454, -4.1815275124))
            ThreePointArc((-4.7426180454, -4.1815275124), (-3.7357793059, -3.9135900073), (-2.7307964524, -4.1884067061))
        make_face()
        Polygon((-4.7426180454, -4.1815275124), (-5.9926180557, -2.0164640089), (-8.260372003, -3.3257523753), (-7.0103719926, -5.4908158787), align=None)
        with BuildLine():
            Line((-7.0103719926, -5.4908158787), (-8.260372003, -3.3257523753))
            ThreePointArc((-8.260372003, -3.3257523753), (-9.5998090366, -3.4180507148), (-10.4951545136, -2.4175673179))
            ThreePointArc((-10.4951545136, -2.4175673179), (-9.327093573, -5.3850000446), (-7.341251894, -7.8802868367))
            ThreePointArc((-7.341251894, -7.8802868367), (-7.7600232055, -6.6046532141), (-7.0103719926, -5.4908158787))
        make_face()
    extrude(amount=F10_DEPTH, mode=Mode.SUBTRACT)

    # F11 (on Top) → F12 (join)
    with BuildSketch(Plane.XY):
        Circle(F11_R)
        Circle(F11_R_2, mode=Mode.SUBTRACT)
    with SkipClean():  # cleaning this boolean's faces spoils the solid; the shape is the same uncleaned
        extrude(amount=F12_DEPTH)


solid = f4_1.part
